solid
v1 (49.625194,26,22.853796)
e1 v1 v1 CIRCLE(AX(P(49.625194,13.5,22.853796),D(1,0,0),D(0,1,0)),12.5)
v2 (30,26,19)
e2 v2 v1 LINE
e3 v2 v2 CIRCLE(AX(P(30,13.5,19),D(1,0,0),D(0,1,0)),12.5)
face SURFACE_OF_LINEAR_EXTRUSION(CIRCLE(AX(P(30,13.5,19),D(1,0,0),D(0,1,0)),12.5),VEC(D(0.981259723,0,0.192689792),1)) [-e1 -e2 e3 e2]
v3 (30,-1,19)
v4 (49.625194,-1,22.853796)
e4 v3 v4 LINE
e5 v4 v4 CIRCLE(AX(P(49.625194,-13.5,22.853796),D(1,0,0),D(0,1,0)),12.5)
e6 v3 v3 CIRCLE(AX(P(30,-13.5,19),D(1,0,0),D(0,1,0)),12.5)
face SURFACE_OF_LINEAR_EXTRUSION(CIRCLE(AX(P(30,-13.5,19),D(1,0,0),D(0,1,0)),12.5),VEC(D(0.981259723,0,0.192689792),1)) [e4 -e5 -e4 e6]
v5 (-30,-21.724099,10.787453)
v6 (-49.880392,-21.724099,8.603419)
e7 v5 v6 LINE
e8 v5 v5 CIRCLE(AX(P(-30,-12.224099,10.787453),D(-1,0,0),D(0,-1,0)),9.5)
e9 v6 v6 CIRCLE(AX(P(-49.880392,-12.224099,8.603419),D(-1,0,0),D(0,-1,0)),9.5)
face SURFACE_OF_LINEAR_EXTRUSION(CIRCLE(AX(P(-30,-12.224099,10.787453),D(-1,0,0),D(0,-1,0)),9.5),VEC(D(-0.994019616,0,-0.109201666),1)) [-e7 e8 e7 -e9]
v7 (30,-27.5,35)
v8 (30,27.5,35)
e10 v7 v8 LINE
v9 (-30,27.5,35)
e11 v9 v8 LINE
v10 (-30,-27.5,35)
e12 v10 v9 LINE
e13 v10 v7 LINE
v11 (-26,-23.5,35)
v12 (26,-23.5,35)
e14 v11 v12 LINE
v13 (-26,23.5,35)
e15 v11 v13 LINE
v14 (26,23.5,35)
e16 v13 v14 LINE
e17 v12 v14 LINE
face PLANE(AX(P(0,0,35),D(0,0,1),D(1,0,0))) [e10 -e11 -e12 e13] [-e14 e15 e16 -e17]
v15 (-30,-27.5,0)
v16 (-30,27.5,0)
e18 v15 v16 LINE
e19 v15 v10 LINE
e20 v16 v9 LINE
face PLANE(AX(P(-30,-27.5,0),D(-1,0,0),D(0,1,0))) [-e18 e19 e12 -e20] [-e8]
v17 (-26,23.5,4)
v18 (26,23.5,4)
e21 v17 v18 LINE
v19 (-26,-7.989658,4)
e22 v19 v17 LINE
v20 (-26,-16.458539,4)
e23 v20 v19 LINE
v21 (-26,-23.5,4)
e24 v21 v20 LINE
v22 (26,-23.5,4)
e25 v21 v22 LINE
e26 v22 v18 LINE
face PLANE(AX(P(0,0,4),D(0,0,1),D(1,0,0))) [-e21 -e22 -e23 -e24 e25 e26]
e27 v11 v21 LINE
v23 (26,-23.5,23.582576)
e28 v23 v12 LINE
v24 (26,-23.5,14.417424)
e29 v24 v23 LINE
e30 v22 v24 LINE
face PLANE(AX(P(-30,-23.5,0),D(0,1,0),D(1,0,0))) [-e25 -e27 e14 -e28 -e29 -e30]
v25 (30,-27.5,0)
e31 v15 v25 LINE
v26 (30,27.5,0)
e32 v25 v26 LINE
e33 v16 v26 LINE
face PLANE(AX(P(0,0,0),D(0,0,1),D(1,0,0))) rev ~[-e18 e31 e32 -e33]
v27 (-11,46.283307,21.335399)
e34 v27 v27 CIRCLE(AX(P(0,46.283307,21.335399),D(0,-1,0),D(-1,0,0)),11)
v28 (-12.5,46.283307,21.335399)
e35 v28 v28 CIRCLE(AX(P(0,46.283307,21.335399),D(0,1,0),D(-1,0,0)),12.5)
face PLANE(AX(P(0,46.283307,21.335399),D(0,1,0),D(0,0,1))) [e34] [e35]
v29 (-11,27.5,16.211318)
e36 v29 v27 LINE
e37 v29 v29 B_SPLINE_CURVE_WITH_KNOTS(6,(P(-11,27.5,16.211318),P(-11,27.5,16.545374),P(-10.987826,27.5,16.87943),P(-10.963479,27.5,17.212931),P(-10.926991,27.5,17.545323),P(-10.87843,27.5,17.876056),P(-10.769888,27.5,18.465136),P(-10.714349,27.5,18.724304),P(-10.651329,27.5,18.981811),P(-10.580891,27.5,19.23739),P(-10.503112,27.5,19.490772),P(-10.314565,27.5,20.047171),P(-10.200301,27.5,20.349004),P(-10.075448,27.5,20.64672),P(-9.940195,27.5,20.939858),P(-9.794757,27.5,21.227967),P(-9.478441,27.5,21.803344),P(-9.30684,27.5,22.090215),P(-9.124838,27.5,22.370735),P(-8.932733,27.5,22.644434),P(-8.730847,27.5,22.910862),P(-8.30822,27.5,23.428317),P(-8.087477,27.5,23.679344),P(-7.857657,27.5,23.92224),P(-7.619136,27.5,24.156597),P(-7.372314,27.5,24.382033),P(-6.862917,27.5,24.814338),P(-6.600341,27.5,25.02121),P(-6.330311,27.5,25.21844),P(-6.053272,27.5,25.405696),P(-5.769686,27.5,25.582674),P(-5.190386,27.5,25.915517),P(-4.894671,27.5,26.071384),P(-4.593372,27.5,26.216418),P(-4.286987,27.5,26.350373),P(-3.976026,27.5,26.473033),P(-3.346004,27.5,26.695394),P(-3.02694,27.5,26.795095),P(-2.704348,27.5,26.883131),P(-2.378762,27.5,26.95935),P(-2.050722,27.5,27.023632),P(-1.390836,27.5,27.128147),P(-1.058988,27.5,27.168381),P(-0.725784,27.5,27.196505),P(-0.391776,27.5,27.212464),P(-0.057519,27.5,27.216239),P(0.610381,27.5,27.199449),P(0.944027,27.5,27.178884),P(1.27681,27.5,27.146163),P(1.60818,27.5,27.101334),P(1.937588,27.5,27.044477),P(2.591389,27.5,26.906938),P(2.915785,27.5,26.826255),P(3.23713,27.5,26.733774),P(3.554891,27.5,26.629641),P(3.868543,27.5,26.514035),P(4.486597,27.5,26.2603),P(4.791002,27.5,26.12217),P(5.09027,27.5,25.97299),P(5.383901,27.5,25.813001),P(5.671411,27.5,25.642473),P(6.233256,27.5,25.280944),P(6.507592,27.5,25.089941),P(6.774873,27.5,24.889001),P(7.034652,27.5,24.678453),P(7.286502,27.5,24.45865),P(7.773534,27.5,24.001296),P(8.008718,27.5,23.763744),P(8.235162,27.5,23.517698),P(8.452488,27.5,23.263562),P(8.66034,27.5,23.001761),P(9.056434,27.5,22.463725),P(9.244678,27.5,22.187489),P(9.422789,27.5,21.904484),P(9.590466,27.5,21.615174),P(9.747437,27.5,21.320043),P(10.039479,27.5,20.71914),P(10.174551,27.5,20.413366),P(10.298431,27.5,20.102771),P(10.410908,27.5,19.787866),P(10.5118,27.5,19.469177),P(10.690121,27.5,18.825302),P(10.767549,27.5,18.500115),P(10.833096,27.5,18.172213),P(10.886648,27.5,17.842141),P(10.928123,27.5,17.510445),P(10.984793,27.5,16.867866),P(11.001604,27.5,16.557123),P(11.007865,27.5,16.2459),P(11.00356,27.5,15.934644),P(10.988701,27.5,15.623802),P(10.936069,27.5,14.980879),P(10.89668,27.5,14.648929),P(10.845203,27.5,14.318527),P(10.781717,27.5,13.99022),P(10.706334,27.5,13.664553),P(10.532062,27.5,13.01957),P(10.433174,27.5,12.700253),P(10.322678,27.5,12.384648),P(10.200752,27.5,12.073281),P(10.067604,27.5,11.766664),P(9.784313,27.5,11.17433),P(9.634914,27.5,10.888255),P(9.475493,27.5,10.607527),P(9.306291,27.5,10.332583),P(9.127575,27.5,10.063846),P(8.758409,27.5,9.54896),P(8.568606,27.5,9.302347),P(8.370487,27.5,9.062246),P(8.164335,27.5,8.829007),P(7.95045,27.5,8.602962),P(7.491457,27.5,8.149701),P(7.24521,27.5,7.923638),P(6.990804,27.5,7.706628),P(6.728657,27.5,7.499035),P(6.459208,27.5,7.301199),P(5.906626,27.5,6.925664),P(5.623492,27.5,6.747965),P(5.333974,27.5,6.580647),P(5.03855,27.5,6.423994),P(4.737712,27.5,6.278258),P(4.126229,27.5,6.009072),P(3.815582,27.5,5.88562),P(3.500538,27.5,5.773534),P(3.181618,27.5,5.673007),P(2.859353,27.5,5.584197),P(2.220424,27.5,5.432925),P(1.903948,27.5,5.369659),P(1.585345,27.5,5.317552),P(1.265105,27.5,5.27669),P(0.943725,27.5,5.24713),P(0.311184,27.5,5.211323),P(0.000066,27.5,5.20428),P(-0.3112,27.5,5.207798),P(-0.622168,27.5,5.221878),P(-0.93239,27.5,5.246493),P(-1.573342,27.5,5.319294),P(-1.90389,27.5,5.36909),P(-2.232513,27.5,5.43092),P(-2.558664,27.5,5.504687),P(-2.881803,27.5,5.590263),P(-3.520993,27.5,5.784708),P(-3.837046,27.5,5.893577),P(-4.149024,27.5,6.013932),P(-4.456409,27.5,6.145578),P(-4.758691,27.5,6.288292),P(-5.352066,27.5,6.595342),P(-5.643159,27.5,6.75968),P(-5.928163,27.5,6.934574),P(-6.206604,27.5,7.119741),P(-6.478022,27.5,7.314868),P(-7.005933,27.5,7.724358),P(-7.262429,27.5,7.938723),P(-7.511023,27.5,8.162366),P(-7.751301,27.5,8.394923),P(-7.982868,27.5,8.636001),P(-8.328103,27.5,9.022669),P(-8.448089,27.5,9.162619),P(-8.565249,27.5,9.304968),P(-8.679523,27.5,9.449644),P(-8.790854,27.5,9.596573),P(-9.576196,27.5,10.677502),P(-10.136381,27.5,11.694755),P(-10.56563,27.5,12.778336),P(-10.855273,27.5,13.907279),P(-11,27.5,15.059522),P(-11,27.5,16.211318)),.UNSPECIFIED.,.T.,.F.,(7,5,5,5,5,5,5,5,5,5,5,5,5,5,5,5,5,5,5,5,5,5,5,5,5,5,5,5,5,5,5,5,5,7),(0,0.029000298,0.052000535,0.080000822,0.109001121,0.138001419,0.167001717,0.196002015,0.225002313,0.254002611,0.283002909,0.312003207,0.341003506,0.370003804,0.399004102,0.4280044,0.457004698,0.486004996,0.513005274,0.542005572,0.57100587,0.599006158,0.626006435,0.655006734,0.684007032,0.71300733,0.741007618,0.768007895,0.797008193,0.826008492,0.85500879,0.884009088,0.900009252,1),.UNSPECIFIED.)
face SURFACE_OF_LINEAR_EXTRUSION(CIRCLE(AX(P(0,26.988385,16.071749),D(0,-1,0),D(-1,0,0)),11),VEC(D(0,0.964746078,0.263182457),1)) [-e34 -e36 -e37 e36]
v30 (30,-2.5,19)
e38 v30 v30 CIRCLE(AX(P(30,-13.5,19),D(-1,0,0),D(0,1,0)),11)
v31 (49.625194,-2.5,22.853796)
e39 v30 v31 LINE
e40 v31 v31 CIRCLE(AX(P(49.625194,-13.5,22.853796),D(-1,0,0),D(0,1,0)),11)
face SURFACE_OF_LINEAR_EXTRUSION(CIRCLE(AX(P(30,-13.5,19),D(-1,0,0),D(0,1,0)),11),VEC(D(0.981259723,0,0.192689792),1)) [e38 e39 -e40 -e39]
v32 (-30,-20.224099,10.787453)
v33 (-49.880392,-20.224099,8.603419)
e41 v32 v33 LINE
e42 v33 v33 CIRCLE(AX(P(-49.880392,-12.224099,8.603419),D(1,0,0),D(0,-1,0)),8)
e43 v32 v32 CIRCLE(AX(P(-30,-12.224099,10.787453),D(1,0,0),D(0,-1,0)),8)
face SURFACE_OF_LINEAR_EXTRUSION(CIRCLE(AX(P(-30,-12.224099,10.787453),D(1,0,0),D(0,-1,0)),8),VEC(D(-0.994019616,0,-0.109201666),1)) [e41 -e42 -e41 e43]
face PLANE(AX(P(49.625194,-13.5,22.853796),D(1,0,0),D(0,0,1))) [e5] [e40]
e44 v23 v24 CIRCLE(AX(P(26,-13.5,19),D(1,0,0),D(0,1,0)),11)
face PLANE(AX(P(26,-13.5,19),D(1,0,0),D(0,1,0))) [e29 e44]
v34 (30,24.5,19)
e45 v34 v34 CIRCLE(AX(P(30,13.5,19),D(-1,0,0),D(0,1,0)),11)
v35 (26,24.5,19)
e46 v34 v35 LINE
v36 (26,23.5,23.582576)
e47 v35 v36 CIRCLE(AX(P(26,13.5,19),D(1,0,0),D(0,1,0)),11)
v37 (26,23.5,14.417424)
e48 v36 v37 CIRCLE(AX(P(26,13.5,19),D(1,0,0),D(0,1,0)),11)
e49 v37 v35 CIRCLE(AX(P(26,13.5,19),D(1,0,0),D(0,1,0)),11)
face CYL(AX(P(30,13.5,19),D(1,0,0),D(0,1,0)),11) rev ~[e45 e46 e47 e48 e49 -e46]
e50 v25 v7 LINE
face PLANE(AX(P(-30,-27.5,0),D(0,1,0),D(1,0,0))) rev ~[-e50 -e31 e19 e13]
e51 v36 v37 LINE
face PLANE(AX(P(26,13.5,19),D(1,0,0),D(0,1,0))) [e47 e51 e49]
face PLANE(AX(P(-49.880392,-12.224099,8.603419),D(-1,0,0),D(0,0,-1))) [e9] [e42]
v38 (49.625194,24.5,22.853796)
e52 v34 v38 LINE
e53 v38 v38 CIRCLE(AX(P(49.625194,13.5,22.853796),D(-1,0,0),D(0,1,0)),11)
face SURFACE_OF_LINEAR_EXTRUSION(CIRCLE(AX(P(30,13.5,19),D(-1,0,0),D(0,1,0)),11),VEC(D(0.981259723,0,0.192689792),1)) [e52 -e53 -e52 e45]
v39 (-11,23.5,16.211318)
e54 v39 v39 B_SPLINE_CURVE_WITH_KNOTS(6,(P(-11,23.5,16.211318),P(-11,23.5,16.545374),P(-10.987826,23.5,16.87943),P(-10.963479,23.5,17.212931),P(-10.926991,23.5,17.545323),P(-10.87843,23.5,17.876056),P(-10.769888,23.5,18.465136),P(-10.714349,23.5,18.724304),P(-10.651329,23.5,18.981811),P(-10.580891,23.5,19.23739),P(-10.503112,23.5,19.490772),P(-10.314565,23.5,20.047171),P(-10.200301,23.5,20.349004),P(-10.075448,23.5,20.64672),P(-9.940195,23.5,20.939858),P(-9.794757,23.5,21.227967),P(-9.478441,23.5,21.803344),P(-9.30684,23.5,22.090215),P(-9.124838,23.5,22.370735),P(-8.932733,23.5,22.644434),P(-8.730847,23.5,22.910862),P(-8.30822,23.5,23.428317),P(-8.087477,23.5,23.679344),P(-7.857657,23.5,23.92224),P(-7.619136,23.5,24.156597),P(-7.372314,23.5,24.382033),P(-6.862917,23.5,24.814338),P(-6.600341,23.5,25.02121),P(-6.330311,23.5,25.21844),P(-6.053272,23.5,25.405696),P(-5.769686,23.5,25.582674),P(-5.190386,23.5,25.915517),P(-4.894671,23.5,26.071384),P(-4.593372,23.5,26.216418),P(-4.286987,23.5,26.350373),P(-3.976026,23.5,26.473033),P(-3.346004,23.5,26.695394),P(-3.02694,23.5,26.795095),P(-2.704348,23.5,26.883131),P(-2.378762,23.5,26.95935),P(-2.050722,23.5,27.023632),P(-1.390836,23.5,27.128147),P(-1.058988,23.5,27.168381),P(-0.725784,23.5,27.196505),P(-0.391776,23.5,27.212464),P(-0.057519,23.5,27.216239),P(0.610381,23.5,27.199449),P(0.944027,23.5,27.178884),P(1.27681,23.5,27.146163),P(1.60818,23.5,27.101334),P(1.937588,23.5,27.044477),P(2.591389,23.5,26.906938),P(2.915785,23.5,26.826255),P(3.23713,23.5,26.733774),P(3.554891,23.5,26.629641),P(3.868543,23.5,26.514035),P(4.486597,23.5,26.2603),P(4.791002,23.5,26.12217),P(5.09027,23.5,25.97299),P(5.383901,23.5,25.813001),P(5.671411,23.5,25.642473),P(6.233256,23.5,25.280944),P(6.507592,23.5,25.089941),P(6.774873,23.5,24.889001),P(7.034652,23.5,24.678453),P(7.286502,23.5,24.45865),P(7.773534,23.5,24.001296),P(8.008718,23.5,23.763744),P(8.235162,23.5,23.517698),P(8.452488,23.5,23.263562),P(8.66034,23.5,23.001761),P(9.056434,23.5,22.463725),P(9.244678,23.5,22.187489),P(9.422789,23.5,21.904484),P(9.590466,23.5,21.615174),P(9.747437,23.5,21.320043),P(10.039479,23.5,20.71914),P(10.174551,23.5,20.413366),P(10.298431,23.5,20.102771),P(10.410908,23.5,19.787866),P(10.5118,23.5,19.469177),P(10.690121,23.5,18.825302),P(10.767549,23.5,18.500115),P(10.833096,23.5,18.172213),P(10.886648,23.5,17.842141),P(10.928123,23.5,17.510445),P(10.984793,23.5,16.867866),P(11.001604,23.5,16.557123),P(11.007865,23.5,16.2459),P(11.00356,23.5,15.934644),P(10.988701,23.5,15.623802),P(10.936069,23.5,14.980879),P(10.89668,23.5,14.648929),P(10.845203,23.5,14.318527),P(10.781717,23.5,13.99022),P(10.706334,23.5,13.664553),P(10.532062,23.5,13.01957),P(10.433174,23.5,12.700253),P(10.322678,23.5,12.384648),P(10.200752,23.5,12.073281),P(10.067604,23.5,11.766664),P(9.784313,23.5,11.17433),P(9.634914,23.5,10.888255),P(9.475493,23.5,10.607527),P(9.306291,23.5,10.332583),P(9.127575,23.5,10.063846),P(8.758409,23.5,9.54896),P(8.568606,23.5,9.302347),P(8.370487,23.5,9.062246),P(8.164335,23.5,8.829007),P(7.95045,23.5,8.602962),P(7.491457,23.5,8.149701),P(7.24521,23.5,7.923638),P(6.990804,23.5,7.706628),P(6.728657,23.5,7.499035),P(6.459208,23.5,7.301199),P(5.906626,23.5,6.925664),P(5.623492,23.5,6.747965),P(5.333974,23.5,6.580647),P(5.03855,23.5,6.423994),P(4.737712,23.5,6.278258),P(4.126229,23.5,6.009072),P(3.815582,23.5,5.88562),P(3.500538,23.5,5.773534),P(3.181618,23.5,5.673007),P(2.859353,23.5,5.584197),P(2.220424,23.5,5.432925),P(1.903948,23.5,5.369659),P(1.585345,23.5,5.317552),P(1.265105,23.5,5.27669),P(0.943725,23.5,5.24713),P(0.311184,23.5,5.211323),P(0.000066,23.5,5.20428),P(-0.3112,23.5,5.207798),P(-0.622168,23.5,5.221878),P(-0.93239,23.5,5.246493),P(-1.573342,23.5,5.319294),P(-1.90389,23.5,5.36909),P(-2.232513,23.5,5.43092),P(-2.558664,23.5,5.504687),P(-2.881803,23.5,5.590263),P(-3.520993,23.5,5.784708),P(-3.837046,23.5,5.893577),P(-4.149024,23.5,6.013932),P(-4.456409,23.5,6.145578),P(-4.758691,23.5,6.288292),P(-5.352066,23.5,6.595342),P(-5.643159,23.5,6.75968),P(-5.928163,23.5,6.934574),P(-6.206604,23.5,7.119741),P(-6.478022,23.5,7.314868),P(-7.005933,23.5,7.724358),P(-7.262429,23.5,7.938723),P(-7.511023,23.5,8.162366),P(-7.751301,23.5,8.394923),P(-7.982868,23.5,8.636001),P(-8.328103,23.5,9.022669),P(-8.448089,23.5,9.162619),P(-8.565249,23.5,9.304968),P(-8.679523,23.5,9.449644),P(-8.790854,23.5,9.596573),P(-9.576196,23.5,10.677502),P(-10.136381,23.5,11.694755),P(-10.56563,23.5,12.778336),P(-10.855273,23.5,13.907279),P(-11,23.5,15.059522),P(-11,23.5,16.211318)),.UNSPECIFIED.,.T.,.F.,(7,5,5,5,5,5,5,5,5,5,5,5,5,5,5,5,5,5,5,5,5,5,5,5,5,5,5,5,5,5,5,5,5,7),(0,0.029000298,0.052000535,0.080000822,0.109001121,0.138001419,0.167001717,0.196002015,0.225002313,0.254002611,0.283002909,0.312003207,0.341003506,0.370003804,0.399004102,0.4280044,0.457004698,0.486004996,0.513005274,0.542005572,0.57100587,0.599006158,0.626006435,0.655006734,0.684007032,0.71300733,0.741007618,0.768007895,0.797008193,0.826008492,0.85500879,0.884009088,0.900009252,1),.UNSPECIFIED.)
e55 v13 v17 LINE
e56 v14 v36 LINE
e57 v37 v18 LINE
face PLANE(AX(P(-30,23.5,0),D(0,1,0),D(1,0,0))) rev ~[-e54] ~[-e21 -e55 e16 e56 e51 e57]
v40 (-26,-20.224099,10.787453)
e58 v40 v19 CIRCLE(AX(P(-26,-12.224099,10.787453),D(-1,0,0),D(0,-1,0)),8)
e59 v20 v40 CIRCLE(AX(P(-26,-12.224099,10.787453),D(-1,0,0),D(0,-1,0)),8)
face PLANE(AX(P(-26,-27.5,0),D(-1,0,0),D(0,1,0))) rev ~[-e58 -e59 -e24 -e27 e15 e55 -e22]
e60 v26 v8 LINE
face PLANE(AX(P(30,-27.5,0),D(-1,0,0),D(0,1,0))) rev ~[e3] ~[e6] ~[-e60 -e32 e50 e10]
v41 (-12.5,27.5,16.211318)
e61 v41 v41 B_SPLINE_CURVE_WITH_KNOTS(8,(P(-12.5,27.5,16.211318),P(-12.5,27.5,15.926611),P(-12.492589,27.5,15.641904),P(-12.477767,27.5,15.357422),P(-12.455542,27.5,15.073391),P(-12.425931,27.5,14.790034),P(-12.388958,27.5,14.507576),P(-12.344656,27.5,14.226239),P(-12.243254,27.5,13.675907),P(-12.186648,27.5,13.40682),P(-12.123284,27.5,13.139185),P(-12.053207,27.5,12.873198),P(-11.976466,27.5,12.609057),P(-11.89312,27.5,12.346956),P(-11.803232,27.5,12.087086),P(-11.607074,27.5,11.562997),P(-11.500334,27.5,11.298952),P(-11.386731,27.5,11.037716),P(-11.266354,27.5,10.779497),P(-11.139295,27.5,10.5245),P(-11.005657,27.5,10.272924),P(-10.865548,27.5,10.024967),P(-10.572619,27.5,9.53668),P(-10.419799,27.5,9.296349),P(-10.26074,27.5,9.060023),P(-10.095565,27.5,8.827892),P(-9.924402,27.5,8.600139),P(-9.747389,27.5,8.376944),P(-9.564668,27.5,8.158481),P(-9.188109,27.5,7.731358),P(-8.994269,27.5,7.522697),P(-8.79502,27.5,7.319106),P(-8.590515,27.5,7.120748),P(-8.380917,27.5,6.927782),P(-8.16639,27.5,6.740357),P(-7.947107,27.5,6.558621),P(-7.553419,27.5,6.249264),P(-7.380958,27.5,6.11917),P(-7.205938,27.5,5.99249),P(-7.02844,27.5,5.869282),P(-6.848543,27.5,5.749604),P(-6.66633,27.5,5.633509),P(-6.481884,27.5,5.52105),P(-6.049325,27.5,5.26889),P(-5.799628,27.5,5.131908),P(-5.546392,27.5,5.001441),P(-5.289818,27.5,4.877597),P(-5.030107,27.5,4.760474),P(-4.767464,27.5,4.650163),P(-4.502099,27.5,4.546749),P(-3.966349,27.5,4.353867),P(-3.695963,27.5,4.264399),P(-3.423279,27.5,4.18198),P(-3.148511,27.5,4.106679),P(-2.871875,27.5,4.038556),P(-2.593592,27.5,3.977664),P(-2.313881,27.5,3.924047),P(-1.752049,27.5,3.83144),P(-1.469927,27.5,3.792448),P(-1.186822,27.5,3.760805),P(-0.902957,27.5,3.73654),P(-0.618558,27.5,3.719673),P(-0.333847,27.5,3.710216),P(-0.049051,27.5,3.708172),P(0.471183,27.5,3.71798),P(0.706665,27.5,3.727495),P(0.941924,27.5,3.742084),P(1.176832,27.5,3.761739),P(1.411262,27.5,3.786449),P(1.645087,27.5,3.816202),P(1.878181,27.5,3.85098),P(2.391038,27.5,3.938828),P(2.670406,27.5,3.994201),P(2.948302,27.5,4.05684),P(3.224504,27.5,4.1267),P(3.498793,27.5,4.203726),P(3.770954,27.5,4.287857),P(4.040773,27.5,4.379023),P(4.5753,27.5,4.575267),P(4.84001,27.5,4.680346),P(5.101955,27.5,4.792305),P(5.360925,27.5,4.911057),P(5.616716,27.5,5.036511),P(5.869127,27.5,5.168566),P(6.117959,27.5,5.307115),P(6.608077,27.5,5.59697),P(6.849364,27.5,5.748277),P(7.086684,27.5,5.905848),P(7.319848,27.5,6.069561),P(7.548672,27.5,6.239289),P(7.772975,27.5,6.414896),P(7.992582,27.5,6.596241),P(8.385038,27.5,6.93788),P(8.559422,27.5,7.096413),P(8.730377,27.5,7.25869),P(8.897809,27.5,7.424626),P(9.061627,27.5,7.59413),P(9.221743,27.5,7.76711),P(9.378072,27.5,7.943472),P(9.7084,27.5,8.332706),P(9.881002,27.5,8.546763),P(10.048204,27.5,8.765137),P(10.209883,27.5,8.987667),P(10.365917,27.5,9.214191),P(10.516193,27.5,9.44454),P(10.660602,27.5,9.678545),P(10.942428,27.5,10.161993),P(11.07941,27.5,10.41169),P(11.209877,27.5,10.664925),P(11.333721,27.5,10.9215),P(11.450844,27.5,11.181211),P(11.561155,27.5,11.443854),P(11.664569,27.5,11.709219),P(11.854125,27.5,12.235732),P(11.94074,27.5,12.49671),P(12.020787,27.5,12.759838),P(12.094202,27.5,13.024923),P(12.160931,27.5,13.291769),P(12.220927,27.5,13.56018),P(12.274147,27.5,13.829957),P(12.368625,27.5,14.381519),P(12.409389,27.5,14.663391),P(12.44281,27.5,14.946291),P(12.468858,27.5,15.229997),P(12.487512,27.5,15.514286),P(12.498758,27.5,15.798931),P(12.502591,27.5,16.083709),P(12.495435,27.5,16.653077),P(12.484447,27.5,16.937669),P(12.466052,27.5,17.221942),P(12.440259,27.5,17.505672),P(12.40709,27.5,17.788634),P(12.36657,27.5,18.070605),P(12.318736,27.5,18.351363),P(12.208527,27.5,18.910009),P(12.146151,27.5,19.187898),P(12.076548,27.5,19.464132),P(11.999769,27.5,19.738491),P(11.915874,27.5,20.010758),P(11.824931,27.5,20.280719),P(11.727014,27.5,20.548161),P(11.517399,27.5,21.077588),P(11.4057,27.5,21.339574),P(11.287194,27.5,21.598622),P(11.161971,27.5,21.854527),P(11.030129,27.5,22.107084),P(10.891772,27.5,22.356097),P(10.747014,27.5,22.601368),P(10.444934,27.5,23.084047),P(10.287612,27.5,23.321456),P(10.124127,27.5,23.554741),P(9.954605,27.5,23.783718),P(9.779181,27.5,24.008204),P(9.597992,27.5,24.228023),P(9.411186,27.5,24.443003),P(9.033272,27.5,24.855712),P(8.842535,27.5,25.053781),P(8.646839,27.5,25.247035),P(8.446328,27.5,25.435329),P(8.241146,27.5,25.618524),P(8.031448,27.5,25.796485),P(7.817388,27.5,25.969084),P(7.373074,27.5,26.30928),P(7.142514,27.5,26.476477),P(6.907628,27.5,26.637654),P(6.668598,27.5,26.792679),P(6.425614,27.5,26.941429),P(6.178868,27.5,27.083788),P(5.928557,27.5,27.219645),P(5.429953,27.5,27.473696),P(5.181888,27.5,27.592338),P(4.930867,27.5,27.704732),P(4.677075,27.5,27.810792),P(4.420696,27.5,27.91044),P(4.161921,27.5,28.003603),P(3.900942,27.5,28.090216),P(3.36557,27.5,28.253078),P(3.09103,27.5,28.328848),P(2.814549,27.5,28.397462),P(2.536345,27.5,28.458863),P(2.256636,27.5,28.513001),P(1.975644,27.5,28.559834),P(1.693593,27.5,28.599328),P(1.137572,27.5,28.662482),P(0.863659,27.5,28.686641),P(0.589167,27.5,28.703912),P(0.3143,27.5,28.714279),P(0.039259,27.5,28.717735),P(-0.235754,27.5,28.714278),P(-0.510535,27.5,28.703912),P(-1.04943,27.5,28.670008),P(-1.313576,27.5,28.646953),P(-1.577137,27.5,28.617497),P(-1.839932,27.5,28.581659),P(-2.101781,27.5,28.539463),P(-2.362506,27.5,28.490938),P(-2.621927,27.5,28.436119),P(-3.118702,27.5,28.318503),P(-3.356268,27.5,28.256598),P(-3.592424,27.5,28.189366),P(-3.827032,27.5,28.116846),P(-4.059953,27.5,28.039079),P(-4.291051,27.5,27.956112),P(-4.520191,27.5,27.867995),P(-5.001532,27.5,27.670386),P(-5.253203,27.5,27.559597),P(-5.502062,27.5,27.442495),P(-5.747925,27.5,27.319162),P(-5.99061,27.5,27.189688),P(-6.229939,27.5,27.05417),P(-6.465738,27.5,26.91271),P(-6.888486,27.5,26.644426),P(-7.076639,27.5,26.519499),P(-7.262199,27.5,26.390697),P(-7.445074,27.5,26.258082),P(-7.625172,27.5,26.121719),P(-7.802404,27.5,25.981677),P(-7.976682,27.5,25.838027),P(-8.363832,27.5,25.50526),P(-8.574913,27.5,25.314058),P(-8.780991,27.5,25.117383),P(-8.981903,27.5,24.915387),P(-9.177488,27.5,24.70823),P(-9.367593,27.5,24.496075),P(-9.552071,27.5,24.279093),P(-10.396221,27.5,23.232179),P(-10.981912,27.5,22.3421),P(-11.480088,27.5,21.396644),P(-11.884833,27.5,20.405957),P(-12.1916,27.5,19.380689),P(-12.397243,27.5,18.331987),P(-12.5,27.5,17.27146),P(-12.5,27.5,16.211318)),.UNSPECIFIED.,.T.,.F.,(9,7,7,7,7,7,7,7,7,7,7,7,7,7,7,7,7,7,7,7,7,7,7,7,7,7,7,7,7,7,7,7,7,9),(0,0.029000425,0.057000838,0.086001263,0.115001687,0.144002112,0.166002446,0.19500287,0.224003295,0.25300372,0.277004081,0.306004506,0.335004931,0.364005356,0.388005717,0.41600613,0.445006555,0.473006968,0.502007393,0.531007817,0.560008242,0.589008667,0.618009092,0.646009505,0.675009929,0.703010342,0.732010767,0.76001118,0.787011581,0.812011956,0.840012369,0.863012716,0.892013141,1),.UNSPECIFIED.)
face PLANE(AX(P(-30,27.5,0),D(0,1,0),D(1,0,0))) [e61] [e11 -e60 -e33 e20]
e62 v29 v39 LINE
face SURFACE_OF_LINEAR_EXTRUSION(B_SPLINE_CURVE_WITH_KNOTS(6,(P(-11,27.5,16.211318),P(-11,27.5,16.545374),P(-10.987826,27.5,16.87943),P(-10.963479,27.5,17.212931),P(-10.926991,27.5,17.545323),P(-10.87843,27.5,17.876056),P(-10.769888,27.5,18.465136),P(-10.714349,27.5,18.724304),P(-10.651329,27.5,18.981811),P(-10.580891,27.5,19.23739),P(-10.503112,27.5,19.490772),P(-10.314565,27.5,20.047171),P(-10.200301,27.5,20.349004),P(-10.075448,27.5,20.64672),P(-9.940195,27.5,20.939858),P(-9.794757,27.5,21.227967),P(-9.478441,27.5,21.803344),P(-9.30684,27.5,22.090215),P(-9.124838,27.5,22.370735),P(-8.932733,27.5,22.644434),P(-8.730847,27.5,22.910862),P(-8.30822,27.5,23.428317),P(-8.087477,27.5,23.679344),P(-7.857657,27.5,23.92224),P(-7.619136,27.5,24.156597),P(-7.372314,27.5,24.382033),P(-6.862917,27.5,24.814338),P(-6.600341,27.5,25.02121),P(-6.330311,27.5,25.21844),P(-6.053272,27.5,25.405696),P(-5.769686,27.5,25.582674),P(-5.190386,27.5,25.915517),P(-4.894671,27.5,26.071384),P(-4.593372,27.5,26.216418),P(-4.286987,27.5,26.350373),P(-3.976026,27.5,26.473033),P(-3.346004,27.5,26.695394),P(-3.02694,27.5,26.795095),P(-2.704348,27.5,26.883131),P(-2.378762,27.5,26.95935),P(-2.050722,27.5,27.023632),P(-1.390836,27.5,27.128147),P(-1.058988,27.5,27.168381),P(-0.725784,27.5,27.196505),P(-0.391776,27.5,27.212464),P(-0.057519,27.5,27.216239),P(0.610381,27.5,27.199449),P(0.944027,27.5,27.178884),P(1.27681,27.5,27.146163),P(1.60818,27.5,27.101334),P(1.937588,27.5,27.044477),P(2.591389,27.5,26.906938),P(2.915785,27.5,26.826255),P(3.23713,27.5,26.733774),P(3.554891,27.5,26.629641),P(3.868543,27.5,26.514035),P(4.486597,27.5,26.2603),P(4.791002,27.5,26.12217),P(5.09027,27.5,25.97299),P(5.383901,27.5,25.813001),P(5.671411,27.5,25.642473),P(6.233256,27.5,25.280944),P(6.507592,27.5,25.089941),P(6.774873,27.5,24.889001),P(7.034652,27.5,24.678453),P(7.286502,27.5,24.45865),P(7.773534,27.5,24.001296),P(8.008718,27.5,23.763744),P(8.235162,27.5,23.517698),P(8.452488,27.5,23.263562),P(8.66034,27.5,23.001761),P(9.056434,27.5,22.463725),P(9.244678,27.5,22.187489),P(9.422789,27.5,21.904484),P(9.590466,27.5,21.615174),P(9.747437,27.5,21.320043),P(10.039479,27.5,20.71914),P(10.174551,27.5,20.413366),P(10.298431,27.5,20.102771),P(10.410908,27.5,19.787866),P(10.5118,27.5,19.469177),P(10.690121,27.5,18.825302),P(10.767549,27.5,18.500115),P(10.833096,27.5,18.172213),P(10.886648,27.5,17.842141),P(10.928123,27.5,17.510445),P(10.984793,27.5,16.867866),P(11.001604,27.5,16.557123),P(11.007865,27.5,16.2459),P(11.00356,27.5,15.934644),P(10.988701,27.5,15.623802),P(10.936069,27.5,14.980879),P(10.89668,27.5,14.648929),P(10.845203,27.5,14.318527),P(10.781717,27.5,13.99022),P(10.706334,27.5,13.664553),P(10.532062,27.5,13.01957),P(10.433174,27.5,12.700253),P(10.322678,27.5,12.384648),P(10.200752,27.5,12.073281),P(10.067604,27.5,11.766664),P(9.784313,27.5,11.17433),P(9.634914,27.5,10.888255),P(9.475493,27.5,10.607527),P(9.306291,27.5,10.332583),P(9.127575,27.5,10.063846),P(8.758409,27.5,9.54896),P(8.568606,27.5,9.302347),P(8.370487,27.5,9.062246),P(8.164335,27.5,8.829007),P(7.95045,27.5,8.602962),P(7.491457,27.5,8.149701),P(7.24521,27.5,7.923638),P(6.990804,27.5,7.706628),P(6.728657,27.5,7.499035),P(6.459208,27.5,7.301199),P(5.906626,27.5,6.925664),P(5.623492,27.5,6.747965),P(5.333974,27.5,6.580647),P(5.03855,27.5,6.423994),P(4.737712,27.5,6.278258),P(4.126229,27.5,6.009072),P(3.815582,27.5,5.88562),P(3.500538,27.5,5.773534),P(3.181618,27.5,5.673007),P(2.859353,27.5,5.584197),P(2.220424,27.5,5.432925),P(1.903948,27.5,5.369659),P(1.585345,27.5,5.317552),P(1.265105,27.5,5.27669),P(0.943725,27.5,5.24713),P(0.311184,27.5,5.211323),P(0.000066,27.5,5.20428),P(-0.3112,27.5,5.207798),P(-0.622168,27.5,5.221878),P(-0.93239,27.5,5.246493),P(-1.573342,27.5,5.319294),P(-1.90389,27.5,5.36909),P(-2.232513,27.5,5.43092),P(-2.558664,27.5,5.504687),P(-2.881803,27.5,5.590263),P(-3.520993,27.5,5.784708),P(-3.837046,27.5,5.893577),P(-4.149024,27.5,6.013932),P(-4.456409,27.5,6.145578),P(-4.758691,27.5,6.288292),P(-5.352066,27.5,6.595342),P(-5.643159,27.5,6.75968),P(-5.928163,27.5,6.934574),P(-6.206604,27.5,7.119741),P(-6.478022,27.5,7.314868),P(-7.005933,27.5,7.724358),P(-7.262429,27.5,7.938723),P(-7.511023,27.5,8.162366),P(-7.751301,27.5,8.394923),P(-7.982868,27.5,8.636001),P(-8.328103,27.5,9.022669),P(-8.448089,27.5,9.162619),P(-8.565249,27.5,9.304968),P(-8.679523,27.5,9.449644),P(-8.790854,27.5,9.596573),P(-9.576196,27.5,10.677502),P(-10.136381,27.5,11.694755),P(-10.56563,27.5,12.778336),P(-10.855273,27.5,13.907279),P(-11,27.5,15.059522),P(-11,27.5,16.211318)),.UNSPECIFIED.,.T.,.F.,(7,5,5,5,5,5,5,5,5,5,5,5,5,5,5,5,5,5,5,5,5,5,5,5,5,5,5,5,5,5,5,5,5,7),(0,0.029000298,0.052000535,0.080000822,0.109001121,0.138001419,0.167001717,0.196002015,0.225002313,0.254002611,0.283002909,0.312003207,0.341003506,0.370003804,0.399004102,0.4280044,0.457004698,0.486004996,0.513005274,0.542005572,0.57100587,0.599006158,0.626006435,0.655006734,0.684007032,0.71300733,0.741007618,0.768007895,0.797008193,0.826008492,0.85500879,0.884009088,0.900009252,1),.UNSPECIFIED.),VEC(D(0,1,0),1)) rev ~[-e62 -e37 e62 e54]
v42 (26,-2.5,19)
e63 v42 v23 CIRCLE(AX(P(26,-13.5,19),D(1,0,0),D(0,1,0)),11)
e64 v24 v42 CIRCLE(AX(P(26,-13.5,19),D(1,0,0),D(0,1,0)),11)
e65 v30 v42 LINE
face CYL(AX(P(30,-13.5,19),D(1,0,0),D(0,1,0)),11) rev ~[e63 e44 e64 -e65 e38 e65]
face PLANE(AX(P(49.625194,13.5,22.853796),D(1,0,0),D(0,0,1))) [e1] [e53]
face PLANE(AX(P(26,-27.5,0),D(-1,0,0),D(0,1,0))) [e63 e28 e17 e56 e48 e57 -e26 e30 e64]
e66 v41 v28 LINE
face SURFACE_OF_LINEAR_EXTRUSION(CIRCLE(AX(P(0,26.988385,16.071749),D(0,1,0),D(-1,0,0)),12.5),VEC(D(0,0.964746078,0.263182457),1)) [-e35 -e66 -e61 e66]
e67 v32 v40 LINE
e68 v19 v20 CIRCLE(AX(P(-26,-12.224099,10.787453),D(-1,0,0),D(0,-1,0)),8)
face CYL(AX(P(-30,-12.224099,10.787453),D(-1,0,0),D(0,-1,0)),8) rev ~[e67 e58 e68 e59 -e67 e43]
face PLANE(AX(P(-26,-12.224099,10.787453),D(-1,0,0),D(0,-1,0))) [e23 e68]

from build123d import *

# Parameters (mm, degrees)
F0_W      = 60
F0_H      = 55
F1_DEPTH  = 35
F2_T      = -4
F3_R      = 9.5
F3_R_2    = 8
F6_R      = 8
F7_DEPTH  = 4
F8_R      = 12.5
F8_R_2    = 11
F11_R     = 11
F12_DEPTH = 4
F13_R     = 12.5
F13_R_2   = 11
F16_DEPTH = 4


with BuildPart() as f1:
    # F0 (on Top) → F1 (new body)
    with BuildSketch(Plane.XY):
        Rectangle(F0_W, F0_H)
    extrude(amount=F1_DEPTH)

    # F2
    f2_openings = [f1.faces().sort_by_distance(p)[0] for p in [
        (0, 0, 35),
    ]]
    offset(amount=F2_T, openings=f2_openings)

    # F5: sweep along a path in F4
    with BuildLine(Plane.XZ) as f5_path:
        Line((-30, 12.8732416779), (-49.8803923108, 10.6892083519))
    # F3 (on face) → F5 (sweep)
    with BuildSketch(Plane(origin=(-30, 0, 0), x_dir=(0, -1, 0), z_dir=(-1, 0, 0))):
        with Locations((12.2240986817, 10.7874526048)):
            Circle(F3_R)
        with Locations((12.2240986817, 10.7874526048)):
            Circle(F3_R_2, mode=Mode.SUBTRACT)
    sweep(path=f5_path.line)

    # F6 (on face) → F7 (cut, through all)
    with BuildSketch(Plane(origin=(-30, 0, 0), x_dir=(0, -1, 0), z_dir=(-1, 0, 0))):
        with Locations((12.2240986817, 10.7874526048)):
            Circle(F6_R)
    extrude(amount=-F7_DEPTH, mode=Mode.SUBTRACT)

    # F10: sweep along a path in F9
    with BuildLine(Plane.XZ) as f10_path:
        Line((34.9448250159, 21.2307306323), (54.5700194764, 25.0845264738))
    # F8 (on face) → F10 (sweep)
    with BuildSketch(Plane.YZ.offset(30)):
        with Locations((-13.5, 19)):
            Circle(F8_R)
        with Locations((-13.5, 19)):
            Circle(F8_R_2, mode=Mode.SUBTRACT)
        with Locations((13.5, 19)):
            Circle(F8_R)
        with Locations((13.5, 19)):
            Circle(F8_R_2, mode=Mode.SUBTRACT)
    sweep(path=f10_path.line)

    # F11 (on face) → F12 (cut, through all)
    with BuildSketch(Plane.YZ.offset(30)):
        with Locations((13.5, 19)):
            Circle(F11_R)
        with Locations((-13.5, 19)):
            Circle(F11_R)
    extrude(amount=-F12_DEPTH, mode=Mode.SUBTRACT)

    # F15: sweep along a path in F14
    with BuildLine(Plane.YZ) as f15_path:
        Line((26.9883851239, 16.3239016038), (46.2833066753, 21.5875507492))
    # F13 (on face) → F15 (sweep)
    with BuildSketch(Plane(origin=(0, 27.5, 0), x_dir=(-1, 0, 0), z_dir=(0, 1, 0))):
        with Locations((0, 16.2113178521)):
            Circle(F13_R)
        with Locations((0, 16.2113178521)):
            Circle(F13_R_2, mode=Mode.SUBTRACT)
    sweep(path=f15_path.line)

    # F16 (cut, through all): a face of the model
    f16_faces = [f1.faces().sort_by_distance(p)[0] for p in [
        (5.559e-07, 27.5, 16.2113144868),
    ]]
    extrude(f16_faces, amount=-F16_DEPTH, mode=Mode.SUBTRACT)


solid = f1.part
